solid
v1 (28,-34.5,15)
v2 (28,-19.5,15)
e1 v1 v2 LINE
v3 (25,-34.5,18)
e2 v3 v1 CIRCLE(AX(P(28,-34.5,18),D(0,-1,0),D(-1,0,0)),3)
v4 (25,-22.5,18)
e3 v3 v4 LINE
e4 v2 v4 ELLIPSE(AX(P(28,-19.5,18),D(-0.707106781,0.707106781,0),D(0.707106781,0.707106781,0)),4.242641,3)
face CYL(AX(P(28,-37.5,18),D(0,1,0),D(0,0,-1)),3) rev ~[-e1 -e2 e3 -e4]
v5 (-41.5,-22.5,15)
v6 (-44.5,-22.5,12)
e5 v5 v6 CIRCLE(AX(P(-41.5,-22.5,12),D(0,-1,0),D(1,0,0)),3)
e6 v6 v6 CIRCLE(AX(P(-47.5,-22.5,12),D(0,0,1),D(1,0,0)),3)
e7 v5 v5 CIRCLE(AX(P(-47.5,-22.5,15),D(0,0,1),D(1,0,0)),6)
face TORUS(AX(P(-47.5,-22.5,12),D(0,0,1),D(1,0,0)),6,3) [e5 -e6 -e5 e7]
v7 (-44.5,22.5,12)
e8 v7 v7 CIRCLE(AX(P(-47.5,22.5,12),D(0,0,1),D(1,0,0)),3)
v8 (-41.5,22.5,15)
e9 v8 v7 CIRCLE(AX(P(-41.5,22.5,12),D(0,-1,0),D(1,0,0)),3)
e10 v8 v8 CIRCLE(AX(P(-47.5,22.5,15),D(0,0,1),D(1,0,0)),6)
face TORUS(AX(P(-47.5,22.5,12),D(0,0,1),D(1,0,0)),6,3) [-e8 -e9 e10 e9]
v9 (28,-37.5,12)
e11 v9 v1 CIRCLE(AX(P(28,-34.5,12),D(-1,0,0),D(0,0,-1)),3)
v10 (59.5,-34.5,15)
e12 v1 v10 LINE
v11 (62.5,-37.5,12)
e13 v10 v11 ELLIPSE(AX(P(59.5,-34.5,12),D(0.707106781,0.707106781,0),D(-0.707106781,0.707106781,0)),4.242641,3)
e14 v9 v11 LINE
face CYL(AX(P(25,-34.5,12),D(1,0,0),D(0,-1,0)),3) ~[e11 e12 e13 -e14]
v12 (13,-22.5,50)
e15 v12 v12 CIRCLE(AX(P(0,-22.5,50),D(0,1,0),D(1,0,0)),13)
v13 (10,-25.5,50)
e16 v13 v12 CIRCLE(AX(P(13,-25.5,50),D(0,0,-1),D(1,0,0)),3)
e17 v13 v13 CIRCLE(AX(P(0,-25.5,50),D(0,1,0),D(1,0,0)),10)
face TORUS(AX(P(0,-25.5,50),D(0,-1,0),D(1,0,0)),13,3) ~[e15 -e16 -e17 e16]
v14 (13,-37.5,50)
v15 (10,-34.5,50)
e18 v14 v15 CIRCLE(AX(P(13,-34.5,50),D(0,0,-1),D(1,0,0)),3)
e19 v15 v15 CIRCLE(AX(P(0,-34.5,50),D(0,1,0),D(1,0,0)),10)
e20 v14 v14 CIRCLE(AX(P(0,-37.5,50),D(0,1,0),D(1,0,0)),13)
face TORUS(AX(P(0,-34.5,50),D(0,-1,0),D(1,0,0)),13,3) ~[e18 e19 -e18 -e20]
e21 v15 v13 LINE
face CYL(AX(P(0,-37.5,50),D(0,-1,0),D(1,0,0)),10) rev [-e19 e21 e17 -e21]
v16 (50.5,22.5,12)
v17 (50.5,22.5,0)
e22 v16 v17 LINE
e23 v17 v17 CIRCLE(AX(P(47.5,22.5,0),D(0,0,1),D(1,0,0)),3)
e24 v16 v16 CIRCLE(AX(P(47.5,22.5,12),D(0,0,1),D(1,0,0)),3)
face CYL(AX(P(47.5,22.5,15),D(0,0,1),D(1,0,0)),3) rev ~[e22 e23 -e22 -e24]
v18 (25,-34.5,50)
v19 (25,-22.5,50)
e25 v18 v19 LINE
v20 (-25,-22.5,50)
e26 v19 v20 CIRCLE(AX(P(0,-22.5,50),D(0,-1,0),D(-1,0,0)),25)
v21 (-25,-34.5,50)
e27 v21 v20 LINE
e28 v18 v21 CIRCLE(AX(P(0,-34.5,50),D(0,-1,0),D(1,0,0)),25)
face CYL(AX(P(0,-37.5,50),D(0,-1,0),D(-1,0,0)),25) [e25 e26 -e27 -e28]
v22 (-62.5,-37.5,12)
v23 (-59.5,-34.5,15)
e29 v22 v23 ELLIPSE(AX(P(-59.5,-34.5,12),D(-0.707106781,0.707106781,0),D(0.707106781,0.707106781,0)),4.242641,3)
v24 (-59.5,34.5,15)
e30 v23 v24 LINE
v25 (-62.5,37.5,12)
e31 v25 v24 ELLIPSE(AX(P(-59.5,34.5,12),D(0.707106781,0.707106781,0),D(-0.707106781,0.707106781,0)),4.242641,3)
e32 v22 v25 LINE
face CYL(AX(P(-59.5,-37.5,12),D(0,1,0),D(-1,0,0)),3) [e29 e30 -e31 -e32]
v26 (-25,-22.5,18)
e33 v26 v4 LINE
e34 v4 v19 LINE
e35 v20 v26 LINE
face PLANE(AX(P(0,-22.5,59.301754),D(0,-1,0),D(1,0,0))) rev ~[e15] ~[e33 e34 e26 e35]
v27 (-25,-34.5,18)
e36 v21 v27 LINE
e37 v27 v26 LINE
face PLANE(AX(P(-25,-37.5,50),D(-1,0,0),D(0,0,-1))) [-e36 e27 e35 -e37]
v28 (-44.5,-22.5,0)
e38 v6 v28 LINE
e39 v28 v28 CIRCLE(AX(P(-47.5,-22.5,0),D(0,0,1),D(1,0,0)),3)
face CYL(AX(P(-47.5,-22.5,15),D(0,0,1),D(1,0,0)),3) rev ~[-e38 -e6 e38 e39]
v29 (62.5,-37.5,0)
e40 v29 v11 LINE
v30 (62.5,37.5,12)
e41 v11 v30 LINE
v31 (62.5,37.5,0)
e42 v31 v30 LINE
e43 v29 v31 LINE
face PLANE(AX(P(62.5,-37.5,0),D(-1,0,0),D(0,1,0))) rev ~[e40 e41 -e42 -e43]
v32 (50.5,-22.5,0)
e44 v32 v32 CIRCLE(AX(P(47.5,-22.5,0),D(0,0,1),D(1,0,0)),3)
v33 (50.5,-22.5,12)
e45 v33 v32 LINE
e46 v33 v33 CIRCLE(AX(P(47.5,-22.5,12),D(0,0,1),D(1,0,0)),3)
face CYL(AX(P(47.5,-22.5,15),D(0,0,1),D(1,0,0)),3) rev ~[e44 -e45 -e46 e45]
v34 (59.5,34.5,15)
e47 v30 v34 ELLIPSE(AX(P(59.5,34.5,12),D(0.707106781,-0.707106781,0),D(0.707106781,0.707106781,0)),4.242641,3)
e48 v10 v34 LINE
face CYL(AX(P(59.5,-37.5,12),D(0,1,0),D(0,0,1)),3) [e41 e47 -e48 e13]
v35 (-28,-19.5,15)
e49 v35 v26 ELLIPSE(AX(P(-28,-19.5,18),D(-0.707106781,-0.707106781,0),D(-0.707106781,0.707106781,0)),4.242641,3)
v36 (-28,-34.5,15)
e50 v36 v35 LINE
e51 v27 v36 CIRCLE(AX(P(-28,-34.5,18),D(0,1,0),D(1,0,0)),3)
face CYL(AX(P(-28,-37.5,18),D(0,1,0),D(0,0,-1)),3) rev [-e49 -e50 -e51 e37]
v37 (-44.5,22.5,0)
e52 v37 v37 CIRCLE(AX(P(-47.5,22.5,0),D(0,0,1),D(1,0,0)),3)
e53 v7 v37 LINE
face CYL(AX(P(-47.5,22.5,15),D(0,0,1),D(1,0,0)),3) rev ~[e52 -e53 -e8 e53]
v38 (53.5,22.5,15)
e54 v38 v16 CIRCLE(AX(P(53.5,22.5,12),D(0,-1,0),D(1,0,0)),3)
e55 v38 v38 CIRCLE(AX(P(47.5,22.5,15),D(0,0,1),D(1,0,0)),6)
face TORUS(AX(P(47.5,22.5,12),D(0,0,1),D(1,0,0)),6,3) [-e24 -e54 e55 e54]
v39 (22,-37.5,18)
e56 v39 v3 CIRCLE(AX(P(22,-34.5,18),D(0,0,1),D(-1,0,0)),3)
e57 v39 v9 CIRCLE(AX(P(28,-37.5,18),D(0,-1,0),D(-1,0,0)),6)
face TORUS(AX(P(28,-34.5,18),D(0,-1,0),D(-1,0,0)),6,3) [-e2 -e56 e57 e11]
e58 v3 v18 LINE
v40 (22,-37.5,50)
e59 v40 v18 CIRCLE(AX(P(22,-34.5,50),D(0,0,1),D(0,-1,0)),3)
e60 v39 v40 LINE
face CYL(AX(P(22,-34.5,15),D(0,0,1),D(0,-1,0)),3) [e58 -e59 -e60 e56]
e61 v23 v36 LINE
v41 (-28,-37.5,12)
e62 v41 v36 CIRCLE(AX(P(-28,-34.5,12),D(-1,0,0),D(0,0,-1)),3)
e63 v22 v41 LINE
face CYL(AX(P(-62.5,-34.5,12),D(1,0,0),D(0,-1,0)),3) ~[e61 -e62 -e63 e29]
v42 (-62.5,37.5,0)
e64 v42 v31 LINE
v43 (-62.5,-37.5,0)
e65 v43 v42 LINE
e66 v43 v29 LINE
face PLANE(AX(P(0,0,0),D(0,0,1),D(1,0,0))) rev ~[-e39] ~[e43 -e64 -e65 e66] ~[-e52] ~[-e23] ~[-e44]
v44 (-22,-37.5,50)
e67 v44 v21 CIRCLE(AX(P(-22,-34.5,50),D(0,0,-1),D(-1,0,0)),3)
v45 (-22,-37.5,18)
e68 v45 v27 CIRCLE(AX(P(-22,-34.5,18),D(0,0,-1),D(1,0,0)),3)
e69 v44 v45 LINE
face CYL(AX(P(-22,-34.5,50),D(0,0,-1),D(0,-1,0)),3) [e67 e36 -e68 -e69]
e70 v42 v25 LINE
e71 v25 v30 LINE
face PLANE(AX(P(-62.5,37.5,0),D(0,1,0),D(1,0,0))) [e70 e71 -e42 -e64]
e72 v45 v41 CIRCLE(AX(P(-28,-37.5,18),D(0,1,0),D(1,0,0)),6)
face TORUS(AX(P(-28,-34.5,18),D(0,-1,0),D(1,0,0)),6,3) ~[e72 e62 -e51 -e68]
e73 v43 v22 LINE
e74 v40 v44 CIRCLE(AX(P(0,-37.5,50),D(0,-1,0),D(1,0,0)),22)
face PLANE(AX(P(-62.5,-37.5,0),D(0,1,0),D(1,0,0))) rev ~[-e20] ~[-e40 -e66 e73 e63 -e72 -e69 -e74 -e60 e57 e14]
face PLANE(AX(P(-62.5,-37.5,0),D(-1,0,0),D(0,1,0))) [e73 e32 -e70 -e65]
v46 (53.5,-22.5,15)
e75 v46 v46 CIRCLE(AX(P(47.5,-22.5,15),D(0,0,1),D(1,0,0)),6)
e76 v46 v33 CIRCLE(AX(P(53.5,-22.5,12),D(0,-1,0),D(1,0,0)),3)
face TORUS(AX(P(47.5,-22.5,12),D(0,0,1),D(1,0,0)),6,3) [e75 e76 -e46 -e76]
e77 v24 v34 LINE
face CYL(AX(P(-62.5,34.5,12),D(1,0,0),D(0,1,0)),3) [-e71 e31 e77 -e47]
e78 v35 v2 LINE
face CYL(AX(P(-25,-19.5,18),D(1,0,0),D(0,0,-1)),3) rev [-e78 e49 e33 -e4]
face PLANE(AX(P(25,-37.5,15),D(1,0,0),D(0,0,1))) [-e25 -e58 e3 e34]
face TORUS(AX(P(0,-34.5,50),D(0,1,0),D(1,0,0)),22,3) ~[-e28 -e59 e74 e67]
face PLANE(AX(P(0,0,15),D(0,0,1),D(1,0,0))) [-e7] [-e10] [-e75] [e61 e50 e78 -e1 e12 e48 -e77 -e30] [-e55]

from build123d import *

# Parameters (mm, degrees)
F0_W     = 125
F0_H     = 75
F1_DEPTH = 15
F3_DEPTH = 15
F4_R     = 3
F5_DEPTH = 25
F6_R     = 3


with BuildPart() as f1:
    # F0 (on Top) → F1 (new body)
    with BuildSketch(Plane.XY):
        Rectangle(F0_W, F0_H)
    extrude(amount=F1_DEPTH)

    # F2 (on face) → F3 (join)
    with BuildSketch(Plane.XZ.offset(37.5)):
        with BuildLine():
            Line((10, 50), (25, 50))
            ThreePointArc((25, 50), (0, 75), (-25, 50))
            Line((-25, 50), (-10, 50))
            ThreePointArc((-10, 50), (0, 60), (10, 50))
        make_face()
        with BuildLine():
            ThreePointArc((-25, 50), (0, 25), (25, 50))
            Line((25, 50), (10, 50))
            ThreePointArc((10, 50), (0, 40), (-10, 50))
            Line((-10, 50), (-25, 50))
        make_face()
        with BuildLine():
            Line((25, 15), (25, 50))
            ThreePointArc((25, 50), (0, 25), (-25, 50))
            Line((-25, 50), (-25, 15))
            Line((-25, 15), (25, 15))
        make_face()
    extrude(amount=-F3_DEPTH)

    # F4 (on face) → F5 (cut)
    with BuildSketch(Plane.XY.offset(15)):
        with Locations((-47.5, 22.5)):
            Circle(F4_R)
        with Locations((-47.5, -22.5)):
            Circle(F4_R)
        with Locations((47.5, 22.5)):
            Circle(F4_R)
        with Locations((47.5, -22.5)):
            Circle(F4_R)
    extrude(amount=-F5_DEPTH, mode=Mode.SUBTRACT)

    # F6
    f6_edges = [f1.edges().sort_by_distance(p)[0] for p in [
        (-62.5, 0, 15),
        (0, 37.5, 15),
        (-43.75, -37.5, 15),
        (62.5, 0, 15),
        (-25, -30, 15),
        (43.75, -37.5, 15),
        (0, -22.5, 15),
        (25, -30, 15),
        (-50.5, -22.5, 15),
        (44.5, -22.5, 15),
        (-50.5, 22.5, 15),
        (44.5, 22.5, 15),
        (-10, -37.5, 50),
        (-10, -22.5, 50),
        (-25, -37.5, 32.5),
        (0, -37.5, 75),
        (25, -37.5, 32.5),
    ]]
    fillet(f6_edges, radius=F6_R)


solid = f1.part
